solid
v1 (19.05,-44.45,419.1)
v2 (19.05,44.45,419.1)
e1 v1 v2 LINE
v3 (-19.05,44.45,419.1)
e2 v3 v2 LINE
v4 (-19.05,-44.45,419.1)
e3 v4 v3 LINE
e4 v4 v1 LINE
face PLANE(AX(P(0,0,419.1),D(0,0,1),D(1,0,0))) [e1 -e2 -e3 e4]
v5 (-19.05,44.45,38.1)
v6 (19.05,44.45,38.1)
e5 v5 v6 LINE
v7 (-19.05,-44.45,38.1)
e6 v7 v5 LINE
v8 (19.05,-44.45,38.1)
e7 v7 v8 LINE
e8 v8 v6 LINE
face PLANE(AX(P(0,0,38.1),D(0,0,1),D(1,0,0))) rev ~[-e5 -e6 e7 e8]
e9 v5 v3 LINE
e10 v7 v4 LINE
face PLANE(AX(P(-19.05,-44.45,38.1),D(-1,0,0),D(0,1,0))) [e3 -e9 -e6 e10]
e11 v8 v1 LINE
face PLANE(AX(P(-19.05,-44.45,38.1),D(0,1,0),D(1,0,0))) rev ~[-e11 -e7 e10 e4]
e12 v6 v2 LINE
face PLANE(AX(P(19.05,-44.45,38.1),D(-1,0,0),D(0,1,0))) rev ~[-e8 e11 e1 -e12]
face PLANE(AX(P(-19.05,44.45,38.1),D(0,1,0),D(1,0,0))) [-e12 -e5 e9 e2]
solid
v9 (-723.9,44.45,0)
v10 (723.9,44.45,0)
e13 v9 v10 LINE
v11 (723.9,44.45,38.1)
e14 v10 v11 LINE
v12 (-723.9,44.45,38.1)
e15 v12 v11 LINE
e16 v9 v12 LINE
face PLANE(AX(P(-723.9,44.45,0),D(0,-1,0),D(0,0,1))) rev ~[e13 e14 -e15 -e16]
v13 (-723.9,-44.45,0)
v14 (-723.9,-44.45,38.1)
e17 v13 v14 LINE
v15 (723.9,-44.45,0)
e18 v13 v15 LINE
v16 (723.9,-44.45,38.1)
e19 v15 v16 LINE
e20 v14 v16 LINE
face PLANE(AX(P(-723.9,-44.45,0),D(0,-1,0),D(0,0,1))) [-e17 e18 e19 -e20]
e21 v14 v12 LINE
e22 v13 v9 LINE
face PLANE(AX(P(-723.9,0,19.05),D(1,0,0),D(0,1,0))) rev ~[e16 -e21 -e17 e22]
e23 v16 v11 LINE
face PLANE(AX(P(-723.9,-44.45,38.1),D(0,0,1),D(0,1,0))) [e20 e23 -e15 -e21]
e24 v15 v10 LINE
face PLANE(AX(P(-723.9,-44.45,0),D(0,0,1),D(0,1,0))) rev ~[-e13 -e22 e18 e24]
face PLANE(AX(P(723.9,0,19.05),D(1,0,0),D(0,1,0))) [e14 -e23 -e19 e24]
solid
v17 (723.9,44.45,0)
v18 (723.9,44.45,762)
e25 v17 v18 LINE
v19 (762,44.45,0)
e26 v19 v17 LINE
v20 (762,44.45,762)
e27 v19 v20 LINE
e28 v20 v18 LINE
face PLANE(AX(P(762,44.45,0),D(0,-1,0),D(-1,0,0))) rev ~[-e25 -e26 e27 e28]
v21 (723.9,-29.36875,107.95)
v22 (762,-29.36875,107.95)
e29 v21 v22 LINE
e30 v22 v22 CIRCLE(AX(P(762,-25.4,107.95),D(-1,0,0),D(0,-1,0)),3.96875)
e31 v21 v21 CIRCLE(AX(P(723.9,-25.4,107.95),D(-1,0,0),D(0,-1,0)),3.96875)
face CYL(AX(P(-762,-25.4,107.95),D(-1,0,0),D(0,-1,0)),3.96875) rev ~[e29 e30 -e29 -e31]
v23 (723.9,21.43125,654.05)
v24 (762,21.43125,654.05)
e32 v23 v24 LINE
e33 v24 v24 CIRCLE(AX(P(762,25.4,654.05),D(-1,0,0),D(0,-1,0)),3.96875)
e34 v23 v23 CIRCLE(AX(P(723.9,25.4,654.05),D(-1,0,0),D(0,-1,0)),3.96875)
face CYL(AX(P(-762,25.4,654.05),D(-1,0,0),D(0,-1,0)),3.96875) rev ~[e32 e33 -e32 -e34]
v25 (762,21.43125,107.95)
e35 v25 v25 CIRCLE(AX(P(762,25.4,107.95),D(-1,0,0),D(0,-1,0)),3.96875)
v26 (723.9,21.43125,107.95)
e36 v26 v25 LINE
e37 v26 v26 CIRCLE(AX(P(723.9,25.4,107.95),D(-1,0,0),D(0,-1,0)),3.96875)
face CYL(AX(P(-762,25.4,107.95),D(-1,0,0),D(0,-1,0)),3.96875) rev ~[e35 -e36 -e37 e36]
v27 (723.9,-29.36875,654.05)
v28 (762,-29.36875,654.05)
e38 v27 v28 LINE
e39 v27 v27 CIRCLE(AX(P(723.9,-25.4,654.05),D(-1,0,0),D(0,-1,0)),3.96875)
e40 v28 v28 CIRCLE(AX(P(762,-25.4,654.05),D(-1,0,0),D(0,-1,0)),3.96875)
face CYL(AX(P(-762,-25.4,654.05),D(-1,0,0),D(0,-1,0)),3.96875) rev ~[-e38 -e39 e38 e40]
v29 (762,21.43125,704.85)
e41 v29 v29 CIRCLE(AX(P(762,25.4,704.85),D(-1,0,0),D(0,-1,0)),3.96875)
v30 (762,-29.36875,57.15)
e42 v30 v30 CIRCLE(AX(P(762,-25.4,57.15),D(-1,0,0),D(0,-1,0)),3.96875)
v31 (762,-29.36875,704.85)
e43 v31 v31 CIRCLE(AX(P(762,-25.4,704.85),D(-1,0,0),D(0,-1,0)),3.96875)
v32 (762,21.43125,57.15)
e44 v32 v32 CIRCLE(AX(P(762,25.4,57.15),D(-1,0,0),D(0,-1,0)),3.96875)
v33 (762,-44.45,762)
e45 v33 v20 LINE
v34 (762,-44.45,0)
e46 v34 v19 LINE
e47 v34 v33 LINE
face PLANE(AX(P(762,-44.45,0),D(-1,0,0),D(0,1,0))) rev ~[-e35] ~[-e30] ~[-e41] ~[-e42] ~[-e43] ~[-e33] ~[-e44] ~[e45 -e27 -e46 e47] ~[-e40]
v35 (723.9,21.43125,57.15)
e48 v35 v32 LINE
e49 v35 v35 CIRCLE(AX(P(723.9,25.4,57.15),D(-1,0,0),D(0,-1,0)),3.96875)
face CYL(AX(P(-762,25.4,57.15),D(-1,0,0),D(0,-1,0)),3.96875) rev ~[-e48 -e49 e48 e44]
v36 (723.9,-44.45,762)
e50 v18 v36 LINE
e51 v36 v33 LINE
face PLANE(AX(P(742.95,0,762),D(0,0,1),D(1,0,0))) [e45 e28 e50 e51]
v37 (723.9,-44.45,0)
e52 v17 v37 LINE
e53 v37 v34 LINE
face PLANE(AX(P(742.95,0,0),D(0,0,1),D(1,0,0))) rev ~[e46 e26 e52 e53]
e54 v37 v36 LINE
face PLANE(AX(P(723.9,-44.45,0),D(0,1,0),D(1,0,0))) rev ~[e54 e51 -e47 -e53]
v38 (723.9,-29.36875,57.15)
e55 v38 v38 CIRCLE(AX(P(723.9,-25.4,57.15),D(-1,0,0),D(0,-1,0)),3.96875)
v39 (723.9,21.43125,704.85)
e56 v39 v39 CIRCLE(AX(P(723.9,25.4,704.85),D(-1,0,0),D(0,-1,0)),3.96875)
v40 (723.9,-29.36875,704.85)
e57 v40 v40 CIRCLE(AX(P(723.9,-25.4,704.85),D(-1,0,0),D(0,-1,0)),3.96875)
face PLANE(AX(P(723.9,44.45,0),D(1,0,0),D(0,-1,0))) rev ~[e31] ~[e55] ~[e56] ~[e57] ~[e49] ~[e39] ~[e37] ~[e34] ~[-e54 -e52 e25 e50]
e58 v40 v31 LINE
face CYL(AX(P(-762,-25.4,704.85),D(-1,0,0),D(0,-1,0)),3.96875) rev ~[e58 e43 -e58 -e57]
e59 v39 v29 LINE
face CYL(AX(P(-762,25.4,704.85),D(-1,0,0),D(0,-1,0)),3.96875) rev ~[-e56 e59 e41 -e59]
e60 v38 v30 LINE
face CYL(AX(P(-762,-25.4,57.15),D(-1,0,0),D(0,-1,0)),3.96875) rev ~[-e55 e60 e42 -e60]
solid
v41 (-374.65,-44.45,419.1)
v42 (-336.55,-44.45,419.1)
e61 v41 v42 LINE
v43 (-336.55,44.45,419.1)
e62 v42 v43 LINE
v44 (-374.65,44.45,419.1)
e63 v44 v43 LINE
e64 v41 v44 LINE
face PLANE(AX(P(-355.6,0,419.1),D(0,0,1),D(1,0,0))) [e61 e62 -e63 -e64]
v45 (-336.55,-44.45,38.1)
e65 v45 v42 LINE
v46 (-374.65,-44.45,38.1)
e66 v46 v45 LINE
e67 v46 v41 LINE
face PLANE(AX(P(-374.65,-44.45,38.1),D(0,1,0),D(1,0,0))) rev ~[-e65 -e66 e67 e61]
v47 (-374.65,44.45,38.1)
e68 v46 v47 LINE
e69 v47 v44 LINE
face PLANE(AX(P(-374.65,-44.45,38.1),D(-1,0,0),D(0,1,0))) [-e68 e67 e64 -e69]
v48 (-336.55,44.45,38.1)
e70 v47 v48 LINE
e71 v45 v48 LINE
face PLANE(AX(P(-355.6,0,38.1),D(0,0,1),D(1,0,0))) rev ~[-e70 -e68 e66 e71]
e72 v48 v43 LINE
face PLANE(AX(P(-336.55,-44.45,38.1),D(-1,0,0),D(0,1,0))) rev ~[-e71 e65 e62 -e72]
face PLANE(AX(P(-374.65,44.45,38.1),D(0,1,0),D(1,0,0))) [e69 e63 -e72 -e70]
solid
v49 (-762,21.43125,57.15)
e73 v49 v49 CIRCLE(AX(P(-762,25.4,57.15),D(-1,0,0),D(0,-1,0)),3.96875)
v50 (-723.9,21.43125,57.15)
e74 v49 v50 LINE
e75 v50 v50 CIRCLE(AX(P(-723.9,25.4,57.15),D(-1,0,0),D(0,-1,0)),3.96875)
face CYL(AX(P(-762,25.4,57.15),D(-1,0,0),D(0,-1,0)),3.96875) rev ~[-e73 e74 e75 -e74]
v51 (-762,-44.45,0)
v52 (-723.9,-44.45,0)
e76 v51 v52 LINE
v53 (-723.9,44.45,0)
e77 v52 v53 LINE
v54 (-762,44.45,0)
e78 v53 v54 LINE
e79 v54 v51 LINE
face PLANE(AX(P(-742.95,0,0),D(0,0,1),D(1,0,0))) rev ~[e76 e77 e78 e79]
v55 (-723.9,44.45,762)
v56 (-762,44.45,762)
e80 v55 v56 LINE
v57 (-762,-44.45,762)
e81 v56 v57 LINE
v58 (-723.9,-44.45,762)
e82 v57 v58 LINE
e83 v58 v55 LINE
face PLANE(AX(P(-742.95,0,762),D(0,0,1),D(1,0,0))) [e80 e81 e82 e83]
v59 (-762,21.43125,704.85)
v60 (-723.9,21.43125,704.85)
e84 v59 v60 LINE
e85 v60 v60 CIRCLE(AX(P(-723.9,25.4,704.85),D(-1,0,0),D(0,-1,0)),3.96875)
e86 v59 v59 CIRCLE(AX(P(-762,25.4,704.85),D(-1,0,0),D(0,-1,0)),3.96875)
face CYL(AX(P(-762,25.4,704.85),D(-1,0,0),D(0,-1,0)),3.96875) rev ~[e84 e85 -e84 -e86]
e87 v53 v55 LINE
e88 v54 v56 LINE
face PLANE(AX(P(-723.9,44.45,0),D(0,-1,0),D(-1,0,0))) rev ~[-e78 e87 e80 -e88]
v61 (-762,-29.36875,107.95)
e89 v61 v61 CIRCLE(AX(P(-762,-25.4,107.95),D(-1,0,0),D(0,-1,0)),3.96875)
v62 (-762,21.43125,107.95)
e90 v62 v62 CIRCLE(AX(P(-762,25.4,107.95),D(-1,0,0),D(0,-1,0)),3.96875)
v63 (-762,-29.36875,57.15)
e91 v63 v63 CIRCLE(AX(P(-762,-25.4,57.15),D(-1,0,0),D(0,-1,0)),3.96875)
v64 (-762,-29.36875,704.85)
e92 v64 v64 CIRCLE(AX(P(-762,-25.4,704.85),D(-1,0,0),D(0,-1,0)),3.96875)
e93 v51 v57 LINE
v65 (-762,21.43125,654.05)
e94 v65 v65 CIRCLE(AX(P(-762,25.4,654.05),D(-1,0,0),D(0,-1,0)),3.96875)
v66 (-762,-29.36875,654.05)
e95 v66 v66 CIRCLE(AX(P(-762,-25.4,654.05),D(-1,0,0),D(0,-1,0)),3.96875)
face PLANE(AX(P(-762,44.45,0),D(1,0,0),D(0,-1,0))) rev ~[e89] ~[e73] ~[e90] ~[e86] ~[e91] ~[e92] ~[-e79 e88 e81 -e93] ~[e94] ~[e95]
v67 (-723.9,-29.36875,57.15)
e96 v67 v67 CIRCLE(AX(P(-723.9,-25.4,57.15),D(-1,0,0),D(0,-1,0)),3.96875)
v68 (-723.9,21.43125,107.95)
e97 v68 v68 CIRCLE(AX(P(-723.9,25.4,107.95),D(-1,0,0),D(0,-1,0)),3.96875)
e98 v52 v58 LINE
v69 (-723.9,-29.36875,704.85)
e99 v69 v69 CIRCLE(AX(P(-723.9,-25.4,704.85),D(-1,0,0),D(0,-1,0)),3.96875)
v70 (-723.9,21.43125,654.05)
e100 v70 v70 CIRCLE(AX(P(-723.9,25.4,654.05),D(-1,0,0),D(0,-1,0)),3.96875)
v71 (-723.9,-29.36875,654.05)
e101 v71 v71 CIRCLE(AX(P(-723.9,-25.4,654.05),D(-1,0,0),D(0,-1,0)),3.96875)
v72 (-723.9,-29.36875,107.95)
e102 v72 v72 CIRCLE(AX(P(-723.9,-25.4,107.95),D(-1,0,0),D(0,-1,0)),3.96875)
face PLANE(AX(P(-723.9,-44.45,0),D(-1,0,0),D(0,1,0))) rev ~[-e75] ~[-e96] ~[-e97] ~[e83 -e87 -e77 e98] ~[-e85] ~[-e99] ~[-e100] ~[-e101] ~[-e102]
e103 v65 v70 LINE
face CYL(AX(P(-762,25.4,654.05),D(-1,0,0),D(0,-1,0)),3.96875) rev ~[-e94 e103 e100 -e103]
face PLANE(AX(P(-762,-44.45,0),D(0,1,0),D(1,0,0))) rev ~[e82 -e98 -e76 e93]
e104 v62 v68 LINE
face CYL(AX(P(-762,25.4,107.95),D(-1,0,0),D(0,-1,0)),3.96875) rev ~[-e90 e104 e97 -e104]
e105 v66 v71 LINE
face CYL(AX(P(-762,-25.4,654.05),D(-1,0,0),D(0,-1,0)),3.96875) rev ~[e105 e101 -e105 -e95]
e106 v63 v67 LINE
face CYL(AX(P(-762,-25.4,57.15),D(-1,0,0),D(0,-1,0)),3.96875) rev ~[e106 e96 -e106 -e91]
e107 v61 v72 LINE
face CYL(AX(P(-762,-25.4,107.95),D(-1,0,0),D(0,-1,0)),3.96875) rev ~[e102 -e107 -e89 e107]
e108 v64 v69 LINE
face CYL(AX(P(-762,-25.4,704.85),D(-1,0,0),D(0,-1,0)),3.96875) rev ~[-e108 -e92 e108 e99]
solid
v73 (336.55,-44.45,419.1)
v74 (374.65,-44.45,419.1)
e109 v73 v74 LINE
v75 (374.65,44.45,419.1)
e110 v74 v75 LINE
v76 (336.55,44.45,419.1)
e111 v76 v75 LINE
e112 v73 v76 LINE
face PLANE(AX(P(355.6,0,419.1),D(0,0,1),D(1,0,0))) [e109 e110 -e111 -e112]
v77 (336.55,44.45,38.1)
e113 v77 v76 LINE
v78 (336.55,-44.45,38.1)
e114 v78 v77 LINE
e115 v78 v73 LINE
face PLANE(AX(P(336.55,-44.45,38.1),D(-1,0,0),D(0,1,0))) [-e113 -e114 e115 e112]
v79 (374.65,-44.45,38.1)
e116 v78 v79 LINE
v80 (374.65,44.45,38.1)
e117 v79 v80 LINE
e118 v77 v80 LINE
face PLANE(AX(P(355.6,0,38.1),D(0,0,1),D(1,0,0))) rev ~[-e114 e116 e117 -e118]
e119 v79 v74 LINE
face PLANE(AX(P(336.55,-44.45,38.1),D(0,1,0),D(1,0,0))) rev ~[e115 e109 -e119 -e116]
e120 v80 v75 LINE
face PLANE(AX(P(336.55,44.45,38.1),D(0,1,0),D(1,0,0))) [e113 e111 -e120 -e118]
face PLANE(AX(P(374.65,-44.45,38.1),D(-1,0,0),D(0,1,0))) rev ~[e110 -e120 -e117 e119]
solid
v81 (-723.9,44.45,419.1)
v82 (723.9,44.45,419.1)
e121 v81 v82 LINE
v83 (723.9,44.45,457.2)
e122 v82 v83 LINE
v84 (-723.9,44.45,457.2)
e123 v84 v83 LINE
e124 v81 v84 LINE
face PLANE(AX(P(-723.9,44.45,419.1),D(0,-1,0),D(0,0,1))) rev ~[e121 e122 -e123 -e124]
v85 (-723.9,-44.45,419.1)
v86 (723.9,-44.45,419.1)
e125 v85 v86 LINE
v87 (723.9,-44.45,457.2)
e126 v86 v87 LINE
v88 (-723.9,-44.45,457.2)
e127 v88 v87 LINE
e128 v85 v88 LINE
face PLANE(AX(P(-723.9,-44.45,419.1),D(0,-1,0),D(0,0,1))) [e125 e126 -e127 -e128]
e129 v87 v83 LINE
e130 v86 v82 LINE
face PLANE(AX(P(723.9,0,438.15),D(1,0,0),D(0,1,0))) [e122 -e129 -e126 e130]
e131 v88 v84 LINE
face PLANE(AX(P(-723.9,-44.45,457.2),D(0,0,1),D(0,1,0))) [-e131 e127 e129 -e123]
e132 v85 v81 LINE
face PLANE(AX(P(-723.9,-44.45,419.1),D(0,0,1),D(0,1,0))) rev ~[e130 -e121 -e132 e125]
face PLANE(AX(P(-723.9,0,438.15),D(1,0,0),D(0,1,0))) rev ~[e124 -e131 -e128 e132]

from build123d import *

# Parameters (mm, degrees)
F1_DEPTH = 762
F2_W     = 88.9
F2_H     = 38.1
F3_DEPTH = 1447.8
F4_W     = 38.1
F4_H     = 88.9
F5_DEPTH = 381
F6_R     = 3.96875
F7_DEPTH = 1524.001


with BuildPart() as f1:
    # F0 (on Top) → F1 (new body)
    with BuildSketch(Plane.XY):
        Polygon((-723.9, 0), (-723.9, 44.45), (-762, 44.45), (-762, -44.45), (-723.9, -44.45), align=None)
    extrude(amount=F1_DEPTH)


with BuildPart() as f1b:
    # F0 (on Top) → F1, piece 2 (new body)
    with BuildSketch(Plane.XY):
        Polygon((723.9, 44.45), (723.9, 0), (723.9, -44.45), (762, -44.45), (762, 44.45), align=None)
    extrude(amount=F1_DEPTH)


with BuildPart() as f3:
    # F2 (on face) → F3 (new body, through all)
    with BuildSketch(Plane.YZ.offset(-723.9)):
        with Locations((0, 19.05)):
            Rectangle(F2_W, F2_H)
    extrude(amount=F3_DEPTH)


with BuildPart() as f3b:
    # F2 (on face) → F3, piece 2 (new body, through all)
    with BuildSketch(Plane.YZ.offset(-723.9)):
        with Locations((0, 438.15)):
            Rectangle(F2_W, F2_H)
    extrude(amount=F3_DEPTH)


with BuildPart() as f5:
    # F4 (on face) → F5 (new body, through all)
    with BuildSketch(Plane.XY.offset(38.1)):
        Rectangle(F4_W, F4_H)
    extrude(amount=F5_DEPTH)


with BuildPart() as f5b:
    # F4 (on face) → F5, piece 2 (new body, through all)
    with BuildSketch(Plane.XY.offset(38.1)):
        with Locations((-355.6, 0)):
            Rectangle(F4_W, F4_H)
    extrude(amount=F5_DEPTH)


with BuildPart() as f5c:
    # F4 (on face) → F5, piece 3 (new body, through all)
    with BuildSketch(Plane.XY.offset(38.1)):
        with Locations((355.6, 0)):
            Rectangle(F4_W, F4_H)
    extrude(amount=F5_DEPTH)


with BuildPart() as f7_tool:
    # F6 (on face) → F7 (new body, through all)
    with BuildSketch(Plane(origin=(-762, 0, 0), x_dir=(0, -1, 0), z_dir=(-1, 0, 0))):
        with Locations((-25.4, 57.15)):
            Circle(F6_R)
        with Locations((-25.4, 107.95)):
            Circle(F6_R)
        with Locations((25.4, 107.95)):
            Circle(F6_R)
        with Locations((25.4, 57.15)):
            Circle(F6_R)
        with Locations((-25.4, 654.05)):
            Circle(F6_R)
        with Locations((-25.4, 704.85)):
            Circle(F6_R)
        with Locations((25.4, 704.85)):
            Circle(F6_R)
        with Locations((25.4, 654.05)):
            Circle(F6_R)
    extrude(amount=-F7_DEPTH)


with BuildPart() as f1_1:
    add(f1.part)

    # F7: cut by f7_tool
    add(f7_tool.part, mode=Mode.SUBTRACT)


with BuildPart() as f1b_1:
    add(f1b.part)

    # F7: cut by f7_tool
    add(f7_tool.part, mode=Mode.SUBTRACT)


solid = Compound([f3.part, f3b.part, f5.part, f5b.part, f5c.part, f1_1.part, f1b_1.part])
